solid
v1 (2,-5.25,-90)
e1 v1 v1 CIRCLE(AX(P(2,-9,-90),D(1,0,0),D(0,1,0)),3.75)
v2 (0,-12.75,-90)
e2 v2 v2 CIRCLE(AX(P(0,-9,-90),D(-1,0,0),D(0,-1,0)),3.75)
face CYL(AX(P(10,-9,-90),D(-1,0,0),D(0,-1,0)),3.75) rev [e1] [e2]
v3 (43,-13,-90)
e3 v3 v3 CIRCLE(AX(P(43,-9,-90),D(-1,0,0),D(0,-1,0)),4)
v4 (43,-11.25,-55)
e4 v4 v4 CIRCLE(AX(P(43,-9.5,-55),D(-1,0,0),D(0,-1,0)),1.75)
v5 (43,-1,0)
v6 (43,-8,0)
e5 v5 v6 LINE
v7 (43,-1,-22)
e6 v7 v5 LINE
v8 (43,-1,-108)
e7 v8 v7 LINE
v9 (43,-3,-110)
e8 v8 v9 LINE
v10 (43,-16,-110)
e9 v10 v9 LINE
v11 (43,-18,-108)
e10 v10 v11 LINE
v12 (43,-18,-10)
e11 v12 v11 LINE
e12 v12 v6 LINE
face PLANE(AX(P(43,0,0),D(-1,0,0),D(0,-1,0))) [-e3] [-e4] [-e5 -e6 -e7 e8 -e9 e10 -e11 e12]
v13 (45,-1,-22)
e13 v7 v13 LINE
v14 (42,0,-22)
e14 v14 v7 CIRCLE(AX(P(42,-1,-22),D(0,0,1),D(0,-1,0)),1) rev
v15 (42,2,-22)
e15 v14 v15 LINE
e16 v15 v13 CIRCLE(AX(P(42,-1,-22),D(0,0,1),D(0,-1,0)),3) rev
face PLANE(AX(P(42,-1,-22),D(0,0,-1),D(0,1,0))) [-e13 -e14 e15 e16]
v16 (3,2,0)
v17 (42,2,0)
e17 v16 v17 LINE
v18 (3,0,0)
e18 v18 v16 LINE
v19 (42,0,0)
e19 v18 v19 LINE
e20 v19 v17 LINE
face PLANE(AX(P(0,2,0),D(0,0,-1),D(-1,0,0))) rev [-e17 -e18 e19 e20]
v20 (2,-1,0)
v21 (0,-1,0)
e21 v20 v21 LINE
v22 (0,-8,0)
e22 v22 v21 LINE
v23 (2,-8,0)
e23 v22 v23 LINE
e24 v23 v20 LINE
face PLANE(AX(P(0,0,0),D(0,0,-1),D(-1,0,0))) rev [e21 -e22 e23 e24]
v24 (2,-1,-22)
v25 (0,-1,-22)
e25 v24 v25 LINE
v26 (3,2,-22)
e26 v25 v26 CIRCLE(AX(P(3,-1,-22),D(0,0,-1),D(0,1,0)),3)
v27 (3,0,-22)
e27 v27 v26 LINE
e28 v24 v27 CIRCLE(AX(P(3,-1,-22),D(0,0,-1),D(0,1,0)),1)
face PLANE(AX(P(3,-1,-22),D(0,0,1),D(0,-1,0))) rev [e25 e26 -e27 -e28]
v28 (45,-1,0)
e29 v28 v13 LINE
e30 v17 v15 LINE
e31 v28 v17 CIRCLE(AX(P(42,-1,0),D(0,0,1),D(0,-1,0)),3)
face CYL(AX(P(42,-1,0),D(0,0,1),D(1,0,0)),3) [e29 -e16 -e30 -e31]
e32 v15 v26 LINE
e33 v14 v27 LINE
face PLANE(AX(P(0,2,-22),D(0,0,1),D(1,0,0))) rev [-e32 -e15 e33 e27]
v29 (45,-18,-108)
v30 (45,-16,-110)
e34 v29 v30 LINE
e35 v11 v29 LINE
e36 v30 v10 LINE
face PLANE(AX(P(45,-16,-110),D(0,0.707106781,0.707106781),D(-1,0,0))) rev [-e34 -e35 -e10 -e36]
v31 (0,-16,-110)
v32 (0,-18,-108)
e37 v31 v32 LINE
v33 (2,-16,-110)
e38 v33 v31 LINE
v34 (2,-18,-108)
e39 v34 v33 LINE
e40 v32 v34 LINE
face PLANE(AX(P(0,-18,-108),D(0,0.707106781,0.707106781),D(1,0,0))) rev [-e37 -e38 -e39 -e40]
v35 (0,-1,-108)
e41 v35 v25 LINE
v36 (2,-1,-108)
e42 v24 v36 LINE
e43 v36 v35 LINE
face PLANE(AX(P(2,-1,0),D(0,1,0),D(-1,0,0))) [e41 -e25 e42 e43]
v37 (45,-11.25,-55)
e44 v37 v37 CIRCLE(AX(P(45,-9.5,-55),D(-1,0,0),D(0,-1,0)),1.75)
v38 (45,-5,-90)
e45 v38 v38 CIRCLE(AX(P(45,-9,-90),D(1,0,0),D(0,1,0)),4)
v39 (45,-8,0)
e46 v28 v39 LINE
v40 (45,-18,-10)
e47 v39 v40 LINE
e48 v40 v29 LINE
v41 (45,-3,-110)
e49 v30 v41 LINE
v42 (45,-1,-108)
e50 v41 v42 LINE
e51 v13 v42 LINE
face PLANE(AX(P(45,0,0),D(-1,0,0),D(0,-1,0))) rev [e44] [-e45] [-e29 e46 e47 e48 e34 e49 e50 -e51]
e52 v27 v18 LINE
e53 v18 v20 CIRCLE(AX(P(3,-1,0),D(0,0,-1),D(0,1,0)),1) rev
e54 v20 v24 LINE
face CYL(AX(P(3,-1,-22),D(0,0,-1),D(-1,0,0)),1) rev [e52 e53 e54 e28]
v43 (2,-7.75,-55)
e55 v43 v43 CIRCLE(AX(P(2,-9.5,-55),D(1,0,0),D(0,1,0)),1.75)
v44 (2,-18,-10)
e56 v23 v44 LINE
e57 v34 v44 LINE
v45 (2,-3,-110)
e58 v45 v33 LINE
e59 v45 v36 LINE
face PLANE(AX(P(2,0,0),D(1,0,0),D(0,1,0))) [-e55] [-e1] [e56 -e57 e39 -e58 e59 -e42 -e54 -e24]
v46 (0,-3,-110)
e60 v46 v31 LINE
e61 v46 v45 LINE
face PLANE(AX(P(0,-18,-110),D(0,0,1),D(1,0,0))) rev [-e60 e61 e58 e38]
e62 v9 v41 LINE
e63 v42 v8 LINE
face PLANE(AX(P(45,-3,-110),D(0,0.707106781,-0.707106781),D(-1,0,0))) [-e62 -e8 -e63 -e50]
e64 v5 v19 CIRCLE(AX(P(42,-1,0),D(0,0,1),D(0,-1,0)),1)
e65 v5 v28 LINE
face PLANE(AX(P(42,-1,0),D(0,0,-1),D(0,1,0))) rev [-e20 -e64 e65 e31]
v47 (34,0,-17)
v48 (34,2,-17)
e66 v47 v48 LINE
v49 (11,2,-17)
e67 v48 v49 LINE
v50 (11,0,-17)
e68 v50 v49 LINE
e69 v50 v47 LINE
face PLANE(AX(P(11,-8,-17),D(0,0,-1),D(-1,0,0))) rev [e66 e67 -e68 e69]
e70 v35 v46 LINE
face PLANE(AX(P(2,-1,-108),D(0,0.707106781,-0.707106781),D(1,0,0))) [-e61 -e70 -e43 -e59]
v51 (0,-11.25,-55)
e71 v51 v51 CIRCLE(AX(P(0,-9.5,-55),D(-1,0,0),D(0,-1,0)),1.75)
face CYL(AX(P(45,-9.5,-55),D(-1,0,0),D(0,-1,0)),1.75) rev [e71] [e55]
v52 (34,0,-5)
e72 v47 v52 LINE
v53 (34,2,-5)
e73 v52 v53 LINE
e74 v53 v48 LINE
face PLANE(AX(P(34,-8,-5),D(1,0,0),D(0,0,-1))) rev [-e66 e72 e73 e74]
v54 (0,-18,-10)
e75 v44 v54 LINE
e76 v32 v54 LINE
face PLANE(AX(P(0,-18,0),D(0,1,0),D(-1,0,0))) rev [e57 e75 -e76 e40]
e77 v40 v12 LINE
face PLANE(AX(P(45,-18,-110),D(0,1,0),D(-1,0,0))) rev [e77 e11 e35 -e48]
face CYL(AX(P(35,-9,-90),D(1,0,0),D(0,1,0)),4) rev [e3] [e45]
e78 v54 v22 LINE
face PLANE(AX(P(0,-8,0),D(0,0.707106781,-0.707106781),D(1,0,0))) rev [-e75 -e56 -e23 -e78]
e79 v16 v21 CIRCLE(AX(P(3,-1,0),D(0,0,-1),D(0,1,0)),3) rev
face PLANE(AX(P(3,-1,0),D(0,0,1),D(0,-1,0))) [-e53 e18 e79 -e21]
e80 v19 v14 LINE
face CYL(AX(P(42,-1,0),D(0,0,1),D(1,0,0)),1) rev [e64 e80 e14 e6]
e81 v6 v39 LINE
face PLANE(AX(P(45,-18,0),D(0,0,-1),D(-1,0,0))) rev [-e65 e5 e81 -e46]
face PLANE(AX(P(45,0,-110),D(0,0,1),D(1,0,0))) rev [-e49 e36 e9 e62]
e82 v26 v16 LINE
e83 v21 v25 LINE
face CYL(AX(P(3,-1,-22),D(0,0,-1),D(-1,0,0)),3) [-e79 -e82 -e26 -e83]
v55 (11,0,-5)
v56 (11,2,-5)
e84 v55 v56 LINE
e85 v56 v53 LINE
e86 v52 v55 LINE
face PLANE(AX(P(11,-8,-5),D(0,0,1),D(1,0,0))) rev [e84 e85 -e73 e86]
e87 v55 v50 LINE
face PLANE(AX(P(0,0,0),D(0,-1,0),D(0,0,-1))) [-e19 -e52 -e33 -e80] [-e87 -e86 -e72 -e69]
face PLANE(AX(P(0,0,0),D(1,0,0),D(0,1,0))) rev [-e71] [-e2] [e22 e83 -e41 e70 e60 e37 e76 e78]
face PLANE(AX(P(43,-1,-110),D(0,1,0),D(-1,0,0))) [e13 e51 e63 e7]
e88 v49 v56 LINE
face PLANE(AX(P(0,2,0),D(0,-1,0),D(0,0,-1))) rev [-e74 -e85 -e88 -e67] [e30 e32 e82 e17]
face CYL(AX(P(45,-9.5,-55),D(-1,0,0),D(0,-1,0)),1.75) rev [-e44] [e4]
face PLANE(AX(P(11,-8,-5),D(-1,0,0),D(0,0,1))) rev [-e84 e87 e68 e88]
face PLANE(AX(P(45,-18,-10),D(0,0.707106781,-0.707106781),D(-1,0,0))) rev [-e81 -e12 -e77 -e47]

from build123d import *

# Parameters (mm, degrees)
SKETCH1_W                      = 45
SKETCH1_H                      = 22
BASE_FLANGE1_DEPTH             = 2
EDGE_FLANGE3_STRIP_W           = 10
EDGE_FLANGE3_STRIP_H           = 2
EDGE_FLANGE3_STRIP_CUT_DEPTH   = 22
EDGE_FLANGE3_STRIP_2_W         = 10
EDGE_FLANGE3_STRIP_2_H         = 2
EDGE_FLANGE3_STRIP_CUT_2_DEPTH = 22
EDGE_FLANGE3_DEPTH             = 22
EDGE_FLANGE3_PROFILE_W         = 110
EDGE_FLANGE3_PROFILE_H         = 17
EDGE_FLANGE3_FLAT_DEPTH        = 2
EDGE_FLANGE3_BEND_DEPTH        = 22
EDGE_FLANGE3_PROFILE_2_W       = 110
EDGE_FLANGE3_PROFILE_2_H       = 17
EDGE_FLANGE3_FLAT_2_DEPTH      = 2
SKETCH34_R                     = 4
CUT_EXTRUDE1_DEPTH             = 10
SKETCH35_R                     = 3.75
CUT_EXTRUDE2_DEPTH             = 10
SKETCH36_R                     = 1.75
CUT_EXTRUDE3_DEPTH             = 121.203993278
SKETCH37_W                     = 23
SKETCH37_H                     = 12
CUT_EXTRUDE4_DEPTH             = 10
CHAMFER1_SIZE                  = 2
CHAMFER2_SIZE                  = 10


# Sheet-metal steps are written as plain solids
with BuildPart() as part:
    # Sketch1 → Base-Flange1 (new body)
    with BuildSketch(Plane(origin=(0, 0, 0), x_dir=(1, 0, 0), z_dir=(0, 1, 0))):
        with Locations((22.5, 11)):
            Rectangle(SKETCH1_W, SKETCH1_H)
    extrude(amount=BASE_FLANGE1_DEPTH)

    # Edge-Flange3 strip (across the edge) → Edge-Flange3 strip cut (cut)
    with BuildSketch(Plane(origin=(45, 0, -22), x_dir=(-1, 0, 0), z_dir=(0, 0, 1))):
        with Locations((-2, -1)):
            Rectangle(EDGE_FLANGE3_STRIP_W, EDGE_FLANGE3_STRIP_H)
    extrude(amount=EDGE_FLANGE3_STRIP_CUT_DEPTH, mode=Mode.SUBTRACT)

    # Edge-Flange3 strip 2 (across the edge) → Edge-Flange3 strip cut 2 (cut)
    with BuildSketch(Plane(origin=(0, 0, 0), x_dir=(1, 0, 0), z_dir=(0, 0, -1))):
        with Locations((-2, -1)):
            Rectangle(EDGE_FLANGE3_STRIP_2_W, EDGE_FLANGE3_STRIP_2_H)
    extrude(amount=EDGE_FLANGE3_STRIP_CUT_2_DEPTH, mode=Mode.SUBTRACT)

    # Edge-Flange3 bend section (across the edge) → Edge-Flange3 (add)
    with BuildSketch(Plane(origin=(45, 0, -22), x_dir=(-1, 0, 0), z_dir=(0, 0, 1))):
        with BuildLine():
            Line((0, 1), (2, 1))
            ThreePointArc((2, 1), (2.292893219, 0.292893219), (3, 0))
            Line((3, 0), (3, -2))
            ThreePointArc((3, -2), (0.878679656, -1.121320344), (0, 1))
        make_face()
    extrude(amount=EDGE_FLANGE3_DEPTH)

    # Edge-Flange3 profile (on flange) → Edge-Flange3 flat (add)
    with BuildSketch(Plane(origin=(45, 0, 0), x_dir=(0, 0, 1), z_dir=(1, 0, 0))):
        with Locations((-55, 9.5)):
            Rectangle(EDGE_FLANGE3_PROFILE_W, EDGE_FLANGE3_PROFILE_H)
    extrude(amount=-EDGE_FLANGE3_FLAT_DEPTH)

    # Edge-Flange3 bend section 2 (across the edge) → Edge-Flange3 bend (add)
    with BuildSketch(Plane(origin=(0, 0, 0), x_dir=(1, 0, 0), z_dir=(0, 0, -1))):
        with BuildLine():
            Line((0, 1), (2, 1))
            ThreePointArc((2, 1), (2.292893219, 0.292893219), (3, 0))
            Line((3, 0), (3, -2))
            ThreePointArc((3, -2), (0.878679656, -1.121320344), (0, 1))
        make_face()
    extrude(amount=EDGE_FLANGE3_BEND_DEPTH)

    # Edge-Flange3 profile 2 (on flange) → Edge-Flange3 flat 2 (add)
    with BuildSketch(Plane(origin=(0, 0, 0), x_dir=(0, 0, -1), z_dir=(-1, 0, 0))):
        with Locations((55, 9.5)):
            Rectangle(EDGE_FLANGE3_PROFILE_2_W, EDGE_FLANGE3_PROFILE_2_H)
    extrude(amount=-EDGE_FLANGE3_FLAT_2_DEPTH)

    # Sketch34 → Cut-Extrude1 (cut)
    with BuildSketch(Plane(origin=(45, 0, 0), x_dir=(0, 0, -1), z_dir=(1, 0, 0))):
        with Locations(Location((90, -9, 0), (0, 0, 90))):
            Circle(SKETCH34_R)
    extrude(amount=-CUT_EXTRUDE1_DEPTH, mode=Mode.SUBTRACT)

    # Sketch35 → Cut-Extrude2 (cut)
    with BuildSketch(Plane.ZY):
        with Locations(Location((-90, -9, 0), (0, 0, 270))):
            Circle(SKETCH35_R)
    extrude(amount=-CUT_EXTRUDE2_DEPTH, mode=Mode.SUBTRACT)

    # Sketch36 → Cut-Extrude3 (cut, through all)
    with BuildSketch(Plane.ZY):
        with Locations(Location((-55, -9.5, 0), (0, 0, 270))):
            Circle(SKETCH36_R)
    extrude(amount=-CUT_EXTRUDE3_DEPTH, mode=Mode.SUBTRACT)

    # Sketch37 → Cut-Extrude4 (cut)
    with BuildSketch(Plane(origin=(0, 2, 0), x_dir=(1, 0, 0), z_dir=(0, 1, 0))):
        with Locations((22.5, 11)):
            Rectangle(SKETCH37_W, SKETCH37_H)
    extrude(amount=-CUT_EXTRUDE4_DEPTH, mode=Mode.SUBTRACT)

    # Chamfer1
    chamfer1_edges = [part.edges().sort_by_distance(p)[0] for p in [
        (44, -1, -110),
        (44, -18, -110),
        (1, -1, -110),
        (1, -18, -110),
    ]]
    chamfer(chamfer1_edges, length=CHAMFER1_SIZE)

    # Chamfer2
    chamfer2_edges = [part.edges().sort_by_distance(p)[0] for p in [
        (44, -18, 0),
        (1, -18, 0),
    ]]
    chamfer(chamfer2_edges, length=CHAMFER2_SIZE)


solid = part.part
